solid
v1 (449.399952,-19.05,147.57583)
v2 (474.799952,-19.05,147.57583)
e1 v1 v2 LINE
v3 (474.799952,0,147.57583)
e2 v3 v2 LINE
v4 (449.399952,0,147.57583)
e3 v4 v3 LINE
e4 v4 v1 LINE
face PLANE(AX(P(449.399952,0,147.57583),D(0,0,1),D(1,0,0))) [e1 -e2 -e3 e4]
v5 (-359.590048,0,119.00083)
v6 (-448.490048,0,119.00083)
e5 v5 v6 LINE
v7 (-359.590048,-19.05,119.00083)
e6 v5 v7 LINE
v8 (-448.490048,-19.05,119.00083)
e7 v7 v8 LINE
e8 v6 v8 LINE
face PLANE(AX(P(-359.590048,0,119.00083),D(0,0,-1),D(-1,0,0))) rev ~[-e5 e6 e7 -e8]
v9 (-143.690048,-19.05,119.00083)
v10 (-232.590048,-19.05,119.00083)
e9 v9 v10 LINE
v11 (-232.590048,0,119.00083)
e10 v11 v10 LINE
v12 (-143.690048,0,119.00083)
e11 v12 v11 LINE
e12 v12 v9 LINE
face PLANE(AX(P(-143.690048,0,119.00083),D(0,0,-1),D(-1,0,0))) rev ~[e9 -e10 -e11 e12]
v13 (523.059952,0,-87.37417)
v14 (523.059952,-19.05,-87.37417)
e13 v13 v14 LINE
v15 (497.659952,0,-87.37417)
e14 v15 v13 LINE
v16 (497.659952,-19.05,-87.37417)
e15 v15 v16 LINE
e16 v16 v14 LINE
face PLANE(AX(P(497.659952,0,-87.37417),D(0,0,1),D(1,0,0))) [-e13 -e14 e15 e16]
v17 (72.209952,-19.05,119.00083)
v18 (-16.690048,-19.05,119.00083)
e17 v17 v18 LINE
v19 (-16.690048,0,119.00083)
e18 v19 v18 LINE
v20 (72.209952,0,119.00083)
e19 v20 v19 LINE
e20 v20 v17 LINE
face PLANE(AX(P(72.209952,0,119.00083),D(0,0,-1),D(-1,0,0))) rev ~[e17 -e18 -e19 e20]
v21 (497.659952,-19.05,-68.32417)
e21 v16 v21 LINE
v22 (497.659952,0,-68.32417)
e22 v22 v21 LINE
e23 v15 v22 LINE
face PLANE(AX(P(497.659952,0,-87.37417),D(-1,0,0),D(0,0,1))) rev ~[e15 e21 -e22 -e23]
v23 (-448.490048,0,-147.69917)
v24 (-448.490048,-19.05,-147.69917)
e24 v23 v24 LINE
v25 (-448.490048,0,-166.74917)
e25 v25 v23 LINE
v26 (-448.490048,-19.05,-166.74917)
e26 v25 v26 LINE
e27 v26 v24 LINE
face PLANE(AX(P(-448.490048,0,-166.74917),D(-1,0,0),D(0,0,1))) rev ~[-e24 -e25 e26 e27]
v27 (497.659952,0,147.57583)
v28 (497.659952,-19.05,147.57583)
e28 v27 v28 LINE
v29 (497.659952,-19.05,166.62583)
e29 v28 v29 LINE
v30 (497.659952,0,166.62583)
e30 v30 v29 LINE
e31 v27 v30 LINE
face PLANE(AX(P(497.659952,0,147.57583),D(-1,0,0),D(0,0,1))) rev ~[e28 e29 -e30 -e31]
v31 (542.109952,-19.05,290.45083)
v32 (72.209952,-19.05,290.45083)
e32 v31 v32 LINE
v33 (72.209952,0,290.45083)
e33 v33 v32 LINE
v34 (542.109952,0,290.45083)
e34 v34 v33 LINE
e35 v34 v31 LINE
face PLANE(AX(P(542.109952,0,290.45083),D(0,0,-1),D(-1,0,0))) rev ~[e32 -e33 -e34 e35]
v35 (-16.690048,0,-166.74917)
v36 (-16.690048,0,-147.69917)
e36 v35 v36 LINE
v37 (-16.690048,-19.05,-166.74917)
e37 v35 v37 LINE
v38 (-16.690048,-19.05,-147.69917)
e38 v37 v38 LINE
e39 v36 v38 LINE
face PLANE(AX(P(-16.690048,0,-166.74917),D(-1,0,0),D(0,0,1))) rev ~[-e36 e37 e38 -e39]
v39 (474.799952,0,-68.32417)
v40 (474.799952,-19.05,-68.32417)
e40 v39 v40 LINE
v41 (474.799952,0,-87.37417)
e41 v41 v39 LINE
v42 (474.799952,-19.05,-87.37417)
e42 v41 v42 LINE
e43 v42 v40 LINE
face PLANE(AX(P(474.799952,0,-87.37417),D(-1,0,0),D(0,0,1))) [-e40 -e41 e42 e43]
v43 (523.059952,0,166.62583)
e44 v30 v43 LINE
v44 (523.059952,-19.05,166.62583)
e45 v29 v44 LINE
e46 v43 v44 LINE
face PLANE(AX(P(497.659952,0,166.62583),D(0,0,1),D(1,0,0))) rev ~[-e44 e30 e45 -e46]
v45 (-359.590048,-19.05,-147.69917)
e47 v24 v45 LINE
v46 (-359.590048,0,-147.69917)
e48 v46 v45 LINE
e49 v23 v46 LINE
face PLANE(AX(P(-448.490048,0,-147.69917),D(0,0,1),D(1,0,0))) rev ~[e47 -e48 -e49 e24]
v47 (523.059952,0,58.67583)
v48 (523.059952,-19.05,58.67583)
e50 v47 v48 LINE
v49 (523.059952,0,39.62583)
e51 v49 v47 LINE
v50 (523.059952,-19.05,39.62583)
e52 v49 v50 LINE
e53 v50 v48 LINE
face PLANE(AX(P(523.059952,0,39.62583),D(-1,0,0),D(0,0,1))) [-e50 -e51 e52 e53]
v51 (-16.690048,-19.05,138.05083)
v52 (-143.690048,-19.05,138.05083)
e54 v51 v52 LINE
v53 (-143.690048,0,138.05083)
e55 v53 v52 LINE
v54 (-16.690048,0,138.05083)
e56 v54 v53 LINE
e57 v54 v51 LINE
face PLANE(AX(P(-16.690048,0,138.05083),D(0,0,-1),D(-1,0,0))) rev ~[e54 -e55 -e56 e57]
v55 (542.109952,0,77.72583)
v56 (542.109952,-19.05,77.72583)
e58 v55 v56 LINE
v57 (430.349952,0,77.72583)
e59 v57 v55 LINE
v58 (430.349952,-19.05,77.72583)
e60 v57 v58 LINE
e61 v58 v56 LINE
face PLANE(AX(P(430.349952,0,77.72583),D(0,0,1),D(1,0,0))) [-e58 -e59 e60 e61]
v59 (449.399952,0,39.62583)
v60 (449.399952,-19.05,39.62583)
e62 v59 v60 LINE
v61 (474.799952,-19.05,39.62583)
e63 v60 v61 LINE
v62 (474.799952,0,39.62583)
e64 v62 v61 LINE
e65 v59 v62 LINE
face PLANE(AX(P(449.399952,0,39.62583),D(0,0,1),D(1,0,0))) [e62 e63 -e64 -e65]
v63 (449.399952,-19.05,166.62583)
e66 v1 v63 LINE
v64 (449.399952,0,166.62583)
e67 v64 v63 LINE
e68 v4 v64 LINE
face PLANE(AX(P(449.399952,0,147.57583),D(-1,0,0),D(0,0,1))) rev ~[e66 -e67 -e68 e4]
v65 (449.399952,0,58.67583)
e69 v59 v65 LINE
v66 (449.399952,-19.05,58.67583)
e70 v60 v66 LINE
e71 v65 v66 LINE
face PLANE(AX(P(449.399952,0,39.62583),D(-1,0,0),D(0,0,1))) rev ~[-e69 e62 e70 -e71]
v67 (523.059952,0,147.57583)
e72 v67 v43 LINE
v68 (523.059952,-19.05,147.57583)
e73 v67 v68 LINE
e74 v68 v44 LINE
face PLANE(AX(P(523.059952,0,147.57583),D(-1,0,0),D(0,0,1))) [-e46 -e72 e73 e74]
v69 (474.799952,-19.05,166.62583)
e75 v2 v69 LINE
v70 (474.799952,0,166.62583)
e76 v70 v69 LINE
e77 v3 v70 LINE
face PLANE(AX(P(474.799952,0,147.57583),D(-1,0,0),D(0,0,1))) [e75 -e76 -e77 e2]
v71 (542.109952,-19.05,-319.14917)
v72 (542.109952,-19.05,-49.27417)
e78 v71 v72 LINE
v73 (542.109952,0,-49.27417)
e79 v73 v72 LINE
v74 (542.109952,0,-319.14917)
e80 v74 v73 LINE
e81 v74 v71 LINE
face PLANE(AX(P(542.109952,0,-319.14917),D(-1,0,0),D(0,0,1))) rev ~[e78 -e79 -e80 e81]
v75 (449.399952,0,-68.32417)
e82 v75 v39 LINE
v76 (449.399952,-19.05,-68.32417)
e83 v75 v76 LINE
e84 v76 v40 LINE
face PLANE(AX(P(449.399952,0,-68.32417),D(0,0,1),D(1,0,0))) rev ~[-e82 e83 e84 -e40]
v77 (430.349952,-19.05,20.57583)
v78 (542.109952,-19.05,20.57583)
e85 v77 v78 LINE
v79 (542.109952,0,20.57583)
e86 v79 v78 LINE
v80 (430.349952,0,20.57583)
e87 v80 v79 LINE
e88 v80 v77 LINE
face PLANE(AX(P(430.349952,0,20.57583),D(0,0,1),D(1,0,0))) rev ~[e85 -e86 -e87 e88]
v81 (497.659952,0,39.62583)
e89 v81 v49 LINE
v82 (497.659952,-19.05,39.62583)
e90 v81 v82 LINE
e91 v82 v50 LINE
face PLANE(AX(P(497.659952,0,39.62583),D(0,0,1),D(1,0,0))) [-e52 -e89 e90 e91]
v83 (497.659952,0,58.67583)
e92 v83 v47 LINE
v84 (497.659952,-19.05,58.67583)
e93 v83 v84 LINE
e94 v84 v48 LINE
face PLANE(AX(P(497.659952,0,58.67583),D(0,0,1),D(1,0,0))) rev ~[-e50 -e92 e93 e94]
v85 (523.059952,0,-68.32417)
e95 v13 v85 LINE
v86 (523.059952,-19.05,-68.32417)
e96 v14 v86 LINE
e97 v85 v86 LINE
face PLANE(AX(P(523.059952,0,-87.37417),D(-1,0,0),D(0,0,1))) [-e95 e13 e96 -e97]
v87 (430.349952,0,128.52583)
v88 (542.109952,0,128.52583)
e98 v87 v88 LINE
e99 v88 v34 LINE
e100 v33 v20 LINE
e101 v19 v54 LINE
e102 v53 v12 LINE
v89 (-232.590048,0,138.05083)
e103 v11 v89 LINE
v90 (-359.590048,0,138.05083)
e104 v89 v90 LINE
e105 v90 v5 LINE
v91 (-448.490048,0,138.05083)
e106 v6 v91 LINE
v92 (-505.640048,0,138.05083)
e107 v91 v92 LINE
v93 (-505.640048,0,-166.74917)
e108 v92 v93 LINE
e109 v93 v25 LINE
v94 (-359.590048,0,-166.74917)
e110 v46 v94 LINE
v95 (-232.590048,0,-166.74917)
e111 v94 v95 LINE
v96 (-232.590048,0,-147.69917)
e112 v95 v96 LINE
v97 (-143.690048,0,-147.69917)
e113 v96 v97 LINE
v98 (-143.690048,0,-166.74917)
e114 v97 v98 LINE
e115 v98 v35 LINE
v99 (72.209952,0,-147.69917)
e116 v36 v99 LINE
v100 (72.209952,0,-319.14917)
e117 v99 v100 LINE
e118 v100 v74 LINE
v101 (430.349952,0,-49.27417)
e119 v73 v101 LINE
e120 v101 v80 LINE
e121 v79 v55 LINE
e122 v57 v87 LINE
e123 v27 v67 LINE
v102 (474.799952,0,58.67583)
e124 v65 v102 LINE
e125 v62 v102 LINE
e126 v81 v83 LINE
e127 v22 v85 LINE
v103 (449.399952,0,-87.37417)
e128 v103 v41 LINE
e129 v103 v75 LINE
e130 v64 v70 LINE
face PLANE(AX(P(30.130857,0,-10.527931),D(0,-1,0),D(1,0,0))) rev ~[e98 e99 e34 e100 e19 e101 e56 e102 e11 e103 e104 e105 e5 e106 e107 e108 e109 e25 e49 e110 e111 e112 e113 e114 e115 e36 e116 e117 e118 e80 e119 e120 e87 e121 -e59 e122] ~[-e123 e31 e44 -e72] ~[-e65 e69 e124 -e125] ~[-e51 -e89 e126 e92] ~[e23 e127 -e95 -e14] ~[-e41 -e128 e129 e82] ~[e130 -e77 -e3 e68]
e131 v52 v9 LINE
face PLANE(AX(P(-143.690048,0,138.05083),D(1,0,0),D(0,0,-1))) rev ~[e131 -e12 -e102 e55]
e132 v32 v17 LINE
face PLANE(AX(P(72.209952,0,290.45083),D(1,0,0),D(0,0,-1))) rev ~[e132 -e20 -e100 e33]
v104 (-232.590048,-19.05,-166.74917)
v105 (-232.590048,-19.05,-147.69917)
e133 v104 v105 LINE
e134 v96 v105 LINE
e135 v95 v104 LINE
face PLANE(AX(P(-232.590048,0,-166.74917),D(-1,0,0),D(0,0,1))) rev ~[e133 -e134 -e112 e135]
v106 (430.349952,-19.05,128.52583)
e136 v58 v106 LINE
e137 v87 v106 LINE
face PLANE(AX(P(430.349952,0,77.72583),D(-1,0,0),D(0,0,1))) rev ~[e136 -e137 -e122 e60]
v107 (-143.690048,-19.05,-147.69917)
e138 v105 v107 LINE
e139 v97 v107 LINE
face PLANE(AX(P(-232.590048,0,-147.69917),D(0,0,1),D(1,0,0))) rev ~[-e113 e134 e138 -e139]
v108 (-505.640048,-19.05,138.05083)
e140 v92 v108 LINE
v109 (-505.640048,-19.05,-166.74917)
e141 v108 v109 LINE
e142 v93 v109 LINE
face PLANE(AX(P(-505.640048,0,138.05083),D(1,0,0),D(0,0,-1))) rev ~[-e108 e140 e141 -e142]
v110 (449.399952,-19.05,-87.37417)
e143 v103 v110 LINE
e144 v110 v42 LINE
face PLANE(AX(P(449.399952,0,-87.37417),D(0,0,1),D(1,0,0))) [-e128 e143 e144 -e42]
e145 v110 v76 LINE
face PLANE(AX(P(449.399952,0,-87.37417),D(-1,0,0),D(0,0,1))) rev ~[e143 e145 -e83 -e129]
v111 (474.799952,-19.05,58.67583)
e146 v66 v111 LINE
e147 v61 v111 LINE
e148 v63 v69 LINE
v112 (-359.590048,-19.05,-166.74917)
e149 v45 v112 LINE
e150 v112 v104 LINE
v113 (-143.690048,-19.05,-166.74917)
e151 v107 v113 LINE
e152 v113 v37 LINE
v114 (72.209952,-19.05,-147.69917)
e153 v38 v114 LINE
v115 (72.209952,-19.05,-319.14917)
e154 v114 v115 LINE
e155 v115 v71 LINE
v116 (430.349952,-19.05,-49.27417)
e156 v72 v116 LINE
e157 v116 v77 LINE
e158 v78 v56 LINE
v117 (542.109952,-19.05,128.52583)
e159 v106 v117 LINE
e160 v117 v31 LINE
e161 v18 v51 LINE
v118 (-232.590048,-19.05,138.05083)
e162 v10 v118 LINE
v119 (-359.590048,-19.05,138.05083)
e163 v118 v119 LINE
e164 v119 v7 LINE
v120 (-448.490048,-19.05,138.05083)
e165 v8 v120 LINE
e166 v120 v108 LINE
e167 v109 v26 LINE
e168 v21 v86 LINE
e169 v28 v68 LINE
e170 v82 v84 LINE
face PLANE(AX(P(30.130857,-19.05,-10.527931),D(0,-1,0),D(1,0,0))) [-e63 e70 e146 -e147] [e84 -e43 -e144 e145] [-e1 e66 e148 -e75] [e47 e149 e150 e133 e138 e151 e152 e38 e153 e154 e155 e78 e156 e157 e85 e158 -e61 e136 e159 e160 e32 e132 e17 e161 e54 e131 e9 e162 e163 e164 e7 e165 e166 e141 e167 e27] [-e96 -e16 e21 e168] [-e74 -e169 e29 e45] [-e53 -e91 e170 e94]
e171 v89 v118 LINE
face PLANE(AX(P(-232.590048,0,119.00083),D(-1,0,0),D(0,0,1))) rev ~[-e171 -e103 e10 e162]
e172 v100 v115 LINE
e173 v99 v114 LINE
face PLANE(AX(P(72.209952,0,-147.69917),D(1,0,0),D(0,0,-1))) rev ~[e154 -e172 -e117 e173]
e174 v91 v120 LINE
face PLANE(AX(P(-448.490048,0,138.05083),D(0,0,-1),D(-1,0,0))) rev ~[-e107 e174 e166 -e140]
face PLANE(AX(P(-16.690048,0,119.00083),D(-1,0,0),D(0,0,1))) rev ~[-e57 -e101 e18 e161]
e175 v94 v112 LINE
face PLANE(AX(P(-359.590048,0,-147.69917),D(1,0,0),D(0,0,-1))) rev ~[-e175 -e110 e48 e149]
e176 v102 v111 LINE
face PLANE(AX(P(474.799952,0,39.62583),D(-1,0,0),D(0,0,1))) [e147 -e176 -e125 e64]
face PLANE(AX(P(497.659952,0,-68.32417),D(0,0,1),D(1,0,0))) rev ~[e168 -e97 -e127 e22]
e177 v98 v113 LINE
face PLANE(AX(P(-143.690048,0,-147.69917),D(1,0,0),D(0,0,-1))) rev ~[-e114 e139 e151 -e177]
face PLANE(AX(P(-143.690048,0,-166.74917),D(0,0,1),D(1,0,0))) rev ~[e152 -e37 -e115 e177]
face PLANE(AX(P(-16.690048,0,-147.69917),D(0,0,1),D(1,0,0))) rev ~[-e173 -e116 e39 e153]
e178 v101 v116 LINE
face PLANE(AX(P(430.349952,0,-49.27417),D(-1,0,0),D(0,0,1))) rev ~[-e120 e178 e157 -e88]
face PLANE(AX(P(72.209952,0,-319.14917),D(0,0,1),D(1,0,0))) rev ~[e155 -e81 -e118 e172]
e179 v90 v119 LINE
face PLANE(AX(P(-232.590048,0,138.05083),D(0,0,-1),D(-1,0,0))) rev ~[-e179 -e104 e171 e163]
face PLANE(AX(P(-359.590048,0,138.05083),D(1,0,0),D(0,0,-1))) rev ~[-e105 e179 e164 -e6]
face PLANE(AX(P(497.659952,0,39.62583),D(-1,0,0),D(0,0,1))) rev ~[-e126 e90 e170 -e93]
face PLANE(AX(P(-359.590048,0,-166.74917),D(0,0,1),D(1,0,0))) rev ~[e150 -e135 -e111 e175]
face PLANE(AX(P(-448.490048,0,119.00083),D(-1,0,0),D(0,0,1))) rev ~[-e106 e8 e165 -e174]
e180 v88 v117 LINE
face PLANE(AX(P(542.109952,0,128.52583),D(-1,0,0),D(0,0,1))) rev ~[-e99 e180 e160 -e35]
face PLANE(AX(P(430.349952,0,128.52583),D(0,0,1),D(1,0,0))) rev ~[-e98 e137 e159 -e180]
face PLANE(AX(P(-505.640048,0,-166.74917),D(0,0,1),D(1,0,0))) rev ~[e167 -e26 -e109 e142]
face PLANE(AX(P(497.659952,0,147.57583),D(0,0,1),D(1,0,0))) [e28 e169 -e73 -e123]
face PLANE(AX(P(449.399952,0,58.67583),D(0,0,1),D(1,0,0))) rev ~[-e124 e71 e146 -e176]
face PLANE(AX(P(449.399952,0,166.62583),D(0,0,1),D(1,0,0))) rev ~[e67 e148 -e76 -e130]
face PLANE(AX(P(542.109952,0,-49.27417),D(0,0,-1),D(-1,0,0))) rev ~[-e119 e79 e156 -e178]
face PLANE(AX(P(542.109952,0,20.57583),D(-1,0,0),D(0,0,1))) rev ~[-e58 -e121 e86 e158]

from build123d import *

# Parameters (mm, degrees)
F0_W     = 25.4
F0_H     = 19.05
F0_W_2   = 469.9
F0_H_2   = 152.4
F0_W_3   = 111.76
F0_H_3   = 57.15
F1_DEPTH = 19.05


# Not quite as in the source:
# - a feature names something its author has since deleted; it is built from what else it names


with BuildPart() as f1:
    # F0 (on Front) → F1 (new body)
    with BuildSketch(Plane.XZ):
        Polygon((-448.4900477648, 138.0508303034), (-505.6400477648, 138.0508303034), (-505.6400477648, -166.7491696966), (-448.4900477648, -166.7491696966), (-448.4900477648, -147.6991696966), (-359.5900477648, -147.6991696966), (-359.5900477648, -166.7491696966), (-232.5900477648, -166.7491696966), (-232.5900477648, -147.6991696966), (-143.6900477648, -147.6991696966), (-143.6900477648, -166.7491696966), (-16.6900477648, -166.7491696966), (-16.6900477648, -147.6991696966), (72.2099522352, -147.6991696966), (72.2099522352, -166.7491696966), (542.1099522352, -166.7491696966), (542.1099522352, -49.2741696966), (523.0599522352, -49.2741696966), (497.6599522352, -49.2741696966), (474.7999522352, -49.2741696966), (449.3999522352, -49.2741696966), (430.3499522352, -49.2741696966), (430.3499522352, -23.8741696966), (430.3499522352, 20.5758303034), (430.3499522352, 77.7258303034), (430.3499522352, 90.4258303034), (430.3499522352, 128.5258303034), (449.3999522352, 128.5258303034), (474.7999522352, 128.5258303034), (497.6599522352, 128.5258303034), (523.0599522352, 128.5258303034), (542.1099522352, 128.5258303034), (542.1099522352, 138.0508303034), (474.7999522352, 138.0508303034), (449.3999522352, 138.0508303034), (72.2099522352, 138.0508303034), (72.2099522352, 119.0008303034), (-16.6900477648, 119.0008303034), (-16.6900477648, 138.0508303034), (-143.6900477648, 138.0508303034), (-143.6900477648, 119.0008303034), (-232.5900477648, 119.0008303034), (-232.5900477648, 138.0508303034), (-359.5900477648, 138.0508303034), (-359.5900477648, 119.0008303034), (-448.4900477648, 119.0008303034), align=None)
        with Locations((462.0999522352, -77.8491696966)):
            Rectangle(F0_W, F0_H, mode=Mode.SUBTRACT)
        with Locations((510.3599522352, -77.8491696966)):
            Rectangle(F0_W, F0_H, mode=Mode.SUBTRACT)
        with Locations((307.1599522352, -242.9491696966)):
            Rectangle(F0_W_2, F0_H_2)
        Polygon((72.2099522352, 290.4508303034), (72.2099522352, 138.0508303034), (449.3999522352, 138.0508303034), (474.7999522352, 138.0508303034), (542.1099522352, 138.0508303034), (542.1099522352, 290.4508303034), align=None)
        with Locations((462.0999522352, 157.1008303034)):
            Rectangle(F0_W, F0_H, mode=Mode.SUBTRACT)
        with Locations((510.3599522352, 157.1008303034)):
            Rectangle(F0_W, F0_H, mode=Mode.SUBTRACT)
        with Locations((486.2299522352, 49.1508303034)):
            Rectangle(F0_W_3, F0_H_3)
        with Locations((462.0999522352, 49.1508303034)):
            Rectangle(F0_W, F0_H, mode=Mode.SUBTRACT)
        with Locations((510.3599522352, 49.1508303034)):
            Rectangle(F0_W, F0_H, mode=Mode.SUBTRACT)
    extrude(amount=F1_DEPTH)


solid = f1.part
